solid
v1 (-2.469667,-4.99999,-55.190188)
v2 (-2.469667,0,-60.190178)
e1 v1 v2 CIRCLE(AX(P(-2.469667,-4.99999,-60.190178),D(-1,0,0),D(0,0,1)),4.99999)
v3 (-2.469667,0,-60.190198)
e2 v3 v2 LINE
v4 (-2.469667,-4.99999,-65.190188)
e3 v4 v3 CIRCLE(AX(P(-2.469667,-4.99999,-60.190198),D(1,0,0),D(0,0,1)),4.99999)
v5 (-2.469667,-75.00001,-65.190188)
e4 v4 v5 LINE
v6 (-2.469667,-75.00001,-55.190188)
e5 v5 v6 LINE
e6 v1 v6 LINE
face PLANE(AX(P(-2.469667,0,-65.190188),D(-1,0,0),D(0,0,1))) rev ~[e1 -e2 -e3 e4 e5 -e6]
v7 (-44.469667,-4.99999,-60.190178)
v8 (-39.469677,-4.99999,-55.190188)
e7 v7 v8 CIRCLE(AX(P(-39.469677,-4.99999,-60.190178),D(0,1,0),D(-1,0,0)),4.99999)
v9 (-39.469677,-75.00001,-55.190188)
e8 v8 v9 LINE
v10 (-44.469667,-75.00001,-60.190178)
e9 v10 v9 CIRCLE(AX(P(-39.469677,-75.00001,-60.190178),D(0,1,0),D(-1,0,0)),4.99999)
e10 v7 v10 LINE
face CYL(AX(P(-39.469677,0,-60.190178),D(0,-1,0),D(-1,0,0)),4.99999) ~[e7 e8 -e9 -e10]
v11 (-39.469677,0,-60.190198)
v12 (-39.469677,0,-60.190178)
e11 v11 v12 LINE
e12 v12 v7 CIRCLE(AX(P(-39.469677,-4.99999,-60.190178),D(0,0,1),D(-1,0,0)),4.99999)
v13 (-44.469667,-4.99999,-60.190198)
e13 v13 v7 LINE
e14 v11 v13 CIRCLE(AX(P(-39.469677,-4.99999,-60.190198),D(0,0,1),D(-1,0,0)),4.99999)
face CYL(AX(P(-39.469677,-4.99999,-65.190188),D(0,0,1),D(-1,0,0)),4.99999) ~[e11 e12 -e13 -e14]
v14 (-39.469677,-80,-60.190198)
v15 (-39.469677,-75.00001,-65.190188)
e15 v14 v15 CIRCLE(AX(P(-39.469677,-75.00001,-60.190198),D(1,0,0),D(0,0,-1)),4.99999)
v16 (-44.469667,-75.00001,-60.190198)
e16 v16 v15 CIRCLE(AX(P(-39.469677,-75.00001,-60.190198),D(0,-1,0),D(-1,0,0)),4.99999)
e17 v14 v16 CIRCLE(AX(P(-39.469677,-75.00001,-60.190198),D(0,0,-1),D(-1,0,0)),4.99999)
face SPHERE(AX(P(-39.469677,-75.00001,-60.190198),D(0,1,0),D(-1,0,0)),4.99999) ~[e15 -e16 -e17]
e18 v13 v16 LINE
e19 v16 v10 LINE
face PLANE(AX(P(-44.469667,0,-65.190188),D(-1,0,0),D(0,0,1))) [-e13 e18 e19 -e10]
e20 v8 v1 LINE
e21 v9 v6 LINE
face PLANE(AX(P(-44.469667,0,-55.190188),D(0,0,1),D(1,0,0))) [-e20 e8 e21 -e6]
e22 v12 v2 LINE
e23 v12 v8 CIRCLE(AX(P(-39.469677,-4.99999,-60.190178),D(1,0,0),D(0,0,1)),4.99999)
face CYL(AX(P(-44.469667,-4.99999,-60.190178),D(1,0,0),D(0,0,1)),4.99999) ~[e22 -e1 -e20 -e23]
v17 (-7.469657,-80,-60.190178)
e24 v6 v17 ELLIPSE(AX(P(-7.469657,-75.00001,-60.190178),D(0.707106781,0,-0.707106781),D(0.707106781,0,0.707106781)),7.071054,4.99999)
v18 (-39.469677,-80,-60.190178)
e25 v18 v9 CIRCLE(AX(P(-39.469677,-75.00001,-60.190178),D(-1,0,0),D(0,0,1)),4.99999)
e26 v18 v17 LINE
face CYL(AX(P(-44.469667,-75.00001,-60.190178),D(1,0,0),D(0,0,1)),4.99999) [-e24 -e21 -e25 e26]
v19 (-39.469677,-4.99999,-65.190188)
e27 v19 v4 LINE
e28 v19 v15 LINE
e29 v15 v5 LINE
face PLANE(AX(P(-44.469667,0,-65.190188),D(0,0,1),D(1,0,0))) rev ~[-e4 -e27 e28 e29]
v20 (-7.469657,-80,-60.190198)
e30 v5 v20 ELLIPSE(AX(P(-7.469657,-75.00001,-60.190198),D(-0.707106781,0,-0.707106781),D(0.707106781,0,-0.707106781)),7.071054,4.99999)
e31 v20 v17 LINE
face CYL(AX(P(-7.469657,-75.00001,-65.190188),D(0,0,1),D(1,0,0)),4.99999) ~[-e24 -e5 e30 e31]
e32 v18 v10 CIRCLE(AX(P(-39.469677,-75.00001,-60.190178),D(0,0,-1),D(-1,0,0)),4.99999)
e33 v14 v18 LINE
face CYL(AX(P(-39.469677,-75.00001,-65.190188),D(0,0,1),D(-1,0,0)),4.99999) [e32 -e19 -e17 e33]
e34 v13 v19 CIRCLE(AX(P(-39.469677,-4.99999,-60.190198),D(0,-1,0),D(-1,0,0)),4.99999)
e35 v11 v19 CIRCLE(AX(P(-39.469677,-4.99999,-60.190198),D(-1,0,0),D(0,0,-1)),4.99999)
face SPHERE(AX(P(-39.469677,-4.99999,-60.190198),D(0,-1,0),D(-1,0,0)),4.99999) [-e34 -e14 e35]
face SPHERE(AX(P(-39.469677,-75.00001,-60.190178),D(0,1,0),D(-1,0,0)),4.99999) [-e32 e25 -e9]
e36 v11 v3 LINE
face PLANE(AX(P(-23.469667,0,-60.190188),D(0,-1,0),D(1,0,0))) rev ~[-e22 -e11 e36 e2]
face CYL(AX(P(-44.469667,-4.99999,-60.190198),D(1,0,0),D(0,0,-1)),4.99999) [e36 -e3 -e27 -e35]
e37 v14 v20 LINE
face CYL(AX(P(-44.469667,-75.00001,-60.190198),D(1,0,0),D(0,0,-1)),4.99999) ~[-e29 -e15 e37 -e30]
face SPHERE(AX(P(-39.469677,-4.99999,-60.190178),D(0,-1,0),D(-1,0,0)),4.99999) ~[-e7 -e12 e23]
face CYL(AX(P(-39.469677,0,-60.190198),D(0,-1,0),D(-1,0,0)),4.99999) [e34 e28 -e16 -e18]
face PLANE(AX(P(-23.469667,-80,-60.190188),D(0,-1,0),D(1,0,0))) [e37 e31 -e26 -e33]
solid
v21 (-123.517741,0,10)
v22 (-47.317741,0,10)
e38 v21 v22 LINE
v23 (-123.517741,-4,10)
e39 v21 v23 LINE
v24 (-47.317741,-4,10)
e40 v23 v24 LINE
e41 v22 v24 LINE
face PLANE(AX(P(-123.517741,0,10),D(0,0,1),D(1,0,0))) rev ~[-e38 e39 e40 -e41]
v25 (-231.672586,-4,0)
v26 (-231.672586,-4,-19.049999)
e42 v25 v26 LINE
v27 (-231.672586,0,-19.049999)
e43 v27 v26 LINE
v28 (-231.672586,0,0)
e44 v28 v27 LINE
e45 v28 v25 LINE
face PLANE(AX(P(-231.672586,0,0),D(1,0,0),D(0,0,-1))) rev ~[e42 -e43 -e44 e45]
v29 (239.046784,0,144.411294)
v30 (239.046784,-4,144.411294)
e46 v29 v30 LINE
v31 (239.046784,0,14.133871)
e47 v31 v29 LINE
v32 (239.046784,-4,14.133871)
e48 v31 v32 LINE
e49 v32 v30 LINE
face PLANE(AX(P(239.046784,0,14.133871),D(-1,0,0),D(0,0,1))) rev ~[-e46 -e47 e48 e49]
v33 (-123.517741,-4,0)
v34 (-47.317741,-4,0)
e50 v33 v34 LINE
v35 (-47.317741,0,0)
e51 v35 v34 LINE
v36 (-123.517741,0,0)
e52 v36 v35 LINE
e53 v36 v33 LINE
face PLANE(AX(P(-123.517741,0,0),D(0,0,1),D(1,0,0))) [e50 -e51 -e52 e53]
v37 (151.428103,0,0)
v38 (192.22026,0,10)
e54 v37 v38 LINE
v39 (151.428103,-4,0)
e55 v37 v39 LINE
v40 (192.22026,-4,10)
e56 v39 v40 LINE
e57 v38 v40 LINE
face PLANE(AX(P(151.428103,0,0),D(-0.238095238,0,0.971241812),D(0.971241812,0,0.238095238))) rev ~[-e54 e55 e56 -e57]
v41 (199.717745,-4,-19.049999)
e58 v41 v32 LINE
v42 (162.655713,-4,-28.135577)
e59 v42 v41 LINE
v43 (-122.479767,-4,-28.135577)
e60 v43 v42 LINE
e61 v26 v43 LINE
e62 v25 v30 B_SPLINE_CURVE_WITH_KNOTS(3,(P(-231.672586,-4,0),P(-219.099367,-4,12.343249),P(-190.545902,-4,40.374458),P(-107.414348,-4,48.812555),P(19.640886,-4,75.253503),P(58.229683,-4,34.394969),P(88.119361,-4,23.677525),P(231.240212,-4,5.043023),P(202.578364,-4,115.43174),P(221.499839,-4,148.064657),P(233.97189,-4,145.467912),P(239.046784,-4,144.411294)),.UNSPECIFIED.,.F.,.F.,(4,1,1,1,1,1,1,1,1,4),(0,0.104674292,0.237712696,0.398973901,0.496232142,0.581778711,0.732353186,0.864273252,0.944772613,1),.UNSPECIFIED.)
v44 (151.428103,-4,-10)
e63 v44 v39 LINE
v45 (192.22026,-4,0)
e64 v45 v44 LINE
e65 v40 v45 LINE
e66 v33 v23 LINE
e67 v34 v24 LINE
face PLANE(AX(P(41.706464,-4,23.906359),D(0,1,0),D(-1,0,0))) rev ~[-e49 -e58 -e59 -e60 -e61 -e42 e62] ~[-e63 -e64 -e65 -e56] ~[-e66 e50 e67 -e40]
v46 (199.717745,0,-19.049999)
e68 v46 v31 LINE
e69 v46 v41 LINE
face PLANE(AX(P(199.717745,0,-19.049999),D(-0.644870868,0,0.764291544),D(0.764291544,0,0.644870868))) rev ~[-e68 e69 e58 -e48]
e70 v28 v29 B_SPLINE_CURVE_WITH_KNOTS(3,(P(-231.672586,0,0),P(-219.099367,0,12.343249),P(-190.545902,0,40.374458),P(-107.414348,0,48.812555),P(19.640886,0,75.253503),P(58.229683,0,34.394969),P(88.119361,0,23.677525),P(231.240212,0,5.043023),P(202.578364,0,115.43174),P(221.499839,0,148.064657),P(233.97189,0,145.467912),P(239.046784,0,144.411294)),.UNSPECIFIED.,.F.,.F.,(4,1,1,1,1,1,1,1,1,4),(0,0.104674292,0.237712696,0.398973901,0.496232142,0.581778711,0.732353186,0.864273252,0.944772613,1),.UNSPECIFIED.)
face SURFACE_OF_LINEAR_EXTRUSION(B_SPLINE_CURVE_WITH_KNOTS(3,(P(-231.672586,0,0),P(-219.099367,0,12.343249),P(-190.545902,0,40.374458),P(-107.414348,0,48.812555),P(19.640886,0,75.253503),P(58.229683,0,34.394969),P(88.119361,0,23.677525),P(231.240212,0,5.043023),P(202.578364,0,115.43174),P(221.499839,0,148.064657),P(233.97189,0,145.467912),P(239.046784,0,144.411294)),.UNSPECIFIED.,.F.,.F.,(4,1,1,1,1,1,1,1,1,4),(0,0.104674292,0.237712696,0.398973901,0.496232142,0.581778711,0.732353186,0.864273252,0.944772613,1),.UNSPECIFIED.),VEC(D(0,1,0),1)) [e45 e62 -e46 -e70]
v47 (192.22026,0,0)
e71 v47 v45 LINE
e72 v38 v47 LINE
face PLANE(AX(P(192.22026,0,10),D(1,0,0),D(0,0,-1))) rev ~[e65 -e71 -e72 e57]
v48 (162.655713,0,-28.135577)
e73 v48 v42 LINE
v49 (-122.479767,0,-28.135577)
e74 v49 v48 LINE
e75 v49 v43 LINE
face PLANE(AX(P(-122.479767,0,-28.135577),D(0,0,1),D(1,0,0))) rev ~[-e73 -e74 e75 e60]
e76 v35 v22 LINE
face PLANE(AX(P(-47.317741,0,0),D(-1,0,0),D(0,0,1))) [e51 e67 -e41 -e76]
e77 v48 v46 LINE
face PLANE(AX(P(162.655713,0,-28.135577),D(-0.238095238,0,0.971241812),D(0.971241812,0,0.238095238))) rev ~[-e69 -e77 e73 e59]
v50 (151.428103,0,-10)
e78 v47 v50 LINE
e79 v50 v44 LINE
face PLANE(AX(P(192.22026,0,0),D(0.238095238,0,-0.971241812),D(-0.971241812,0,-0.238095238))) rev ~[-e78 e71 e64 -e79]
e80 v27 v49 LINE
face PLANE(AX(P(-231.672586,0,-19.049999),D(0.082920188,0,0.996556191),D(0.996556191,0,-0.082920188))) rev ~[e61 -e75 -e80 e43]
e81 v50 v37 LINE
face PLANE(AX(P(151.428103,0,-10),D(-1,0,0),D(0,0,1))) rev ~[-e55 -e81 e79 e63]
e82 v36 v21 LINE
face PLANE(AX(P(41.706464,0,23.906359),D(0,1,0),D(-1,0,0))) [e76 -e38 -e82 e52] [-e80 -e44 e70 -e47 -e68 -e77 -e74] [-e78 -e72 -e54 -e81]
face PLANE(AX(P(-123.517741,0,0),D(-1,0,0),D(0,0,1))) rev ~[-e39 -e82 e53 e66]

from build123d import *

# Parameters (mm, degrees)
F0_W     = 76.2
F0_H     = 10
F1_DEPTH = 4
F2_W     = 42
F2_H     = 10
F3_DEPTH = 80
F4_R     = 4.99999


# Not quite as in the source:
# - a fillet or chamfer is up to 0.001 mm smaller than in the source, because OpenCascade refuses the exact size


with BuildPart() as f1:
    # F0 (on Front) → F1 (new body)
    with BuildSketch(Plane.XZ):
        with BuildLine():
            add(Edge.make_bspline(
                [(-231.6725862107, 0), (-219.0993671328, 12.343248795), (-190.5459015942, 40.3744575823), (-107.4143479778, 48.8125552497), (19.6408862931, 75.2535030954), (58.229683436, 34.3949690879), (88.1193610303, 23.6775246845), (231.2402117739, 5.043023493), (202.5783639872, 115.4317400021), (221.4998393715, 148.0646570715), (233.9718904053, 145.4679123311), (239.0467838633, 144.4112935873)],
                knots=[0, 0, 0, 0, 0.1046742923, 0.2377126956, 0.3989739008, 0.4962321415, 0.5817787109, 0.7323531864, 0.8642732523, 0.9447726134, 1, 1, 1, 1], degree=3))
            Line((-231.6725862107, 0), (-231.6725862107, -19.0499990361))
            Line((-231.6725862107, -19.0499990361), (-122.4797673147, -28.1355770861))
            Line((-122.4797673147, -28.1355770861), (127.0137888456, -28.1355770861))
            Line((127.0137888456, -28.1355770861), (162.6557133227, -28.1355770861))
            Line((162.6557133227, -28.1355770861), (199.717745138, -19.0499990361))
            Line((199.717745138, -19.0499990361), (239.0467838633, 14.1338711232))
            Line((239.0467838633, 14.1338711232), (239.0467838633, 144.4112935873))
        make_face()
        with Locations((-85.4177412825, 5)):
            Rectangle(F0_W, F0_H, mode=Mode.SUBTRACT)
        Polygon((151.428103447, -10), (151.428103447, 0), (192.2202595557, 10), (192.2202595557, 0), align=None, mode=Mode.SUBTRACT)
    extrude(amount=F1_DEPTH)


with BuildPart() as f3:
    # F2 (on Front) → F3 (new body)
    with BuildSketch(Plane.XZ):
        with Locations((-23.4696671832, -60.190187508)):
            Rectangle(F2_W, F2_H)
    extrude(amount=F3_DEPTH)

    # F4 (radius 5 in the source; OpenCascade refuses exactly that, so slightly less here)
    f4_edges = [f3.edges().sort_by_distance(p)[0] for p in [
        (-44.469667, -40, -55.190188),
        (-44.469667, -40, -65.190188),
        (-44.469667, -80, -60.190188),
        (-44.469667, 0, -60.190188),
        (-23.469667, -80, -55.190188),
        (-23.469667, -80, -65.190188),
        (-2.469667, -80, -60.190188),
        (-23.469667, 0, -55.190188),
        (-23.469667, 0, -65.190188),
    ]]
    fillet(f4_edges, radius=F4_R)


solid = Compound([f1.part, f3.part])
